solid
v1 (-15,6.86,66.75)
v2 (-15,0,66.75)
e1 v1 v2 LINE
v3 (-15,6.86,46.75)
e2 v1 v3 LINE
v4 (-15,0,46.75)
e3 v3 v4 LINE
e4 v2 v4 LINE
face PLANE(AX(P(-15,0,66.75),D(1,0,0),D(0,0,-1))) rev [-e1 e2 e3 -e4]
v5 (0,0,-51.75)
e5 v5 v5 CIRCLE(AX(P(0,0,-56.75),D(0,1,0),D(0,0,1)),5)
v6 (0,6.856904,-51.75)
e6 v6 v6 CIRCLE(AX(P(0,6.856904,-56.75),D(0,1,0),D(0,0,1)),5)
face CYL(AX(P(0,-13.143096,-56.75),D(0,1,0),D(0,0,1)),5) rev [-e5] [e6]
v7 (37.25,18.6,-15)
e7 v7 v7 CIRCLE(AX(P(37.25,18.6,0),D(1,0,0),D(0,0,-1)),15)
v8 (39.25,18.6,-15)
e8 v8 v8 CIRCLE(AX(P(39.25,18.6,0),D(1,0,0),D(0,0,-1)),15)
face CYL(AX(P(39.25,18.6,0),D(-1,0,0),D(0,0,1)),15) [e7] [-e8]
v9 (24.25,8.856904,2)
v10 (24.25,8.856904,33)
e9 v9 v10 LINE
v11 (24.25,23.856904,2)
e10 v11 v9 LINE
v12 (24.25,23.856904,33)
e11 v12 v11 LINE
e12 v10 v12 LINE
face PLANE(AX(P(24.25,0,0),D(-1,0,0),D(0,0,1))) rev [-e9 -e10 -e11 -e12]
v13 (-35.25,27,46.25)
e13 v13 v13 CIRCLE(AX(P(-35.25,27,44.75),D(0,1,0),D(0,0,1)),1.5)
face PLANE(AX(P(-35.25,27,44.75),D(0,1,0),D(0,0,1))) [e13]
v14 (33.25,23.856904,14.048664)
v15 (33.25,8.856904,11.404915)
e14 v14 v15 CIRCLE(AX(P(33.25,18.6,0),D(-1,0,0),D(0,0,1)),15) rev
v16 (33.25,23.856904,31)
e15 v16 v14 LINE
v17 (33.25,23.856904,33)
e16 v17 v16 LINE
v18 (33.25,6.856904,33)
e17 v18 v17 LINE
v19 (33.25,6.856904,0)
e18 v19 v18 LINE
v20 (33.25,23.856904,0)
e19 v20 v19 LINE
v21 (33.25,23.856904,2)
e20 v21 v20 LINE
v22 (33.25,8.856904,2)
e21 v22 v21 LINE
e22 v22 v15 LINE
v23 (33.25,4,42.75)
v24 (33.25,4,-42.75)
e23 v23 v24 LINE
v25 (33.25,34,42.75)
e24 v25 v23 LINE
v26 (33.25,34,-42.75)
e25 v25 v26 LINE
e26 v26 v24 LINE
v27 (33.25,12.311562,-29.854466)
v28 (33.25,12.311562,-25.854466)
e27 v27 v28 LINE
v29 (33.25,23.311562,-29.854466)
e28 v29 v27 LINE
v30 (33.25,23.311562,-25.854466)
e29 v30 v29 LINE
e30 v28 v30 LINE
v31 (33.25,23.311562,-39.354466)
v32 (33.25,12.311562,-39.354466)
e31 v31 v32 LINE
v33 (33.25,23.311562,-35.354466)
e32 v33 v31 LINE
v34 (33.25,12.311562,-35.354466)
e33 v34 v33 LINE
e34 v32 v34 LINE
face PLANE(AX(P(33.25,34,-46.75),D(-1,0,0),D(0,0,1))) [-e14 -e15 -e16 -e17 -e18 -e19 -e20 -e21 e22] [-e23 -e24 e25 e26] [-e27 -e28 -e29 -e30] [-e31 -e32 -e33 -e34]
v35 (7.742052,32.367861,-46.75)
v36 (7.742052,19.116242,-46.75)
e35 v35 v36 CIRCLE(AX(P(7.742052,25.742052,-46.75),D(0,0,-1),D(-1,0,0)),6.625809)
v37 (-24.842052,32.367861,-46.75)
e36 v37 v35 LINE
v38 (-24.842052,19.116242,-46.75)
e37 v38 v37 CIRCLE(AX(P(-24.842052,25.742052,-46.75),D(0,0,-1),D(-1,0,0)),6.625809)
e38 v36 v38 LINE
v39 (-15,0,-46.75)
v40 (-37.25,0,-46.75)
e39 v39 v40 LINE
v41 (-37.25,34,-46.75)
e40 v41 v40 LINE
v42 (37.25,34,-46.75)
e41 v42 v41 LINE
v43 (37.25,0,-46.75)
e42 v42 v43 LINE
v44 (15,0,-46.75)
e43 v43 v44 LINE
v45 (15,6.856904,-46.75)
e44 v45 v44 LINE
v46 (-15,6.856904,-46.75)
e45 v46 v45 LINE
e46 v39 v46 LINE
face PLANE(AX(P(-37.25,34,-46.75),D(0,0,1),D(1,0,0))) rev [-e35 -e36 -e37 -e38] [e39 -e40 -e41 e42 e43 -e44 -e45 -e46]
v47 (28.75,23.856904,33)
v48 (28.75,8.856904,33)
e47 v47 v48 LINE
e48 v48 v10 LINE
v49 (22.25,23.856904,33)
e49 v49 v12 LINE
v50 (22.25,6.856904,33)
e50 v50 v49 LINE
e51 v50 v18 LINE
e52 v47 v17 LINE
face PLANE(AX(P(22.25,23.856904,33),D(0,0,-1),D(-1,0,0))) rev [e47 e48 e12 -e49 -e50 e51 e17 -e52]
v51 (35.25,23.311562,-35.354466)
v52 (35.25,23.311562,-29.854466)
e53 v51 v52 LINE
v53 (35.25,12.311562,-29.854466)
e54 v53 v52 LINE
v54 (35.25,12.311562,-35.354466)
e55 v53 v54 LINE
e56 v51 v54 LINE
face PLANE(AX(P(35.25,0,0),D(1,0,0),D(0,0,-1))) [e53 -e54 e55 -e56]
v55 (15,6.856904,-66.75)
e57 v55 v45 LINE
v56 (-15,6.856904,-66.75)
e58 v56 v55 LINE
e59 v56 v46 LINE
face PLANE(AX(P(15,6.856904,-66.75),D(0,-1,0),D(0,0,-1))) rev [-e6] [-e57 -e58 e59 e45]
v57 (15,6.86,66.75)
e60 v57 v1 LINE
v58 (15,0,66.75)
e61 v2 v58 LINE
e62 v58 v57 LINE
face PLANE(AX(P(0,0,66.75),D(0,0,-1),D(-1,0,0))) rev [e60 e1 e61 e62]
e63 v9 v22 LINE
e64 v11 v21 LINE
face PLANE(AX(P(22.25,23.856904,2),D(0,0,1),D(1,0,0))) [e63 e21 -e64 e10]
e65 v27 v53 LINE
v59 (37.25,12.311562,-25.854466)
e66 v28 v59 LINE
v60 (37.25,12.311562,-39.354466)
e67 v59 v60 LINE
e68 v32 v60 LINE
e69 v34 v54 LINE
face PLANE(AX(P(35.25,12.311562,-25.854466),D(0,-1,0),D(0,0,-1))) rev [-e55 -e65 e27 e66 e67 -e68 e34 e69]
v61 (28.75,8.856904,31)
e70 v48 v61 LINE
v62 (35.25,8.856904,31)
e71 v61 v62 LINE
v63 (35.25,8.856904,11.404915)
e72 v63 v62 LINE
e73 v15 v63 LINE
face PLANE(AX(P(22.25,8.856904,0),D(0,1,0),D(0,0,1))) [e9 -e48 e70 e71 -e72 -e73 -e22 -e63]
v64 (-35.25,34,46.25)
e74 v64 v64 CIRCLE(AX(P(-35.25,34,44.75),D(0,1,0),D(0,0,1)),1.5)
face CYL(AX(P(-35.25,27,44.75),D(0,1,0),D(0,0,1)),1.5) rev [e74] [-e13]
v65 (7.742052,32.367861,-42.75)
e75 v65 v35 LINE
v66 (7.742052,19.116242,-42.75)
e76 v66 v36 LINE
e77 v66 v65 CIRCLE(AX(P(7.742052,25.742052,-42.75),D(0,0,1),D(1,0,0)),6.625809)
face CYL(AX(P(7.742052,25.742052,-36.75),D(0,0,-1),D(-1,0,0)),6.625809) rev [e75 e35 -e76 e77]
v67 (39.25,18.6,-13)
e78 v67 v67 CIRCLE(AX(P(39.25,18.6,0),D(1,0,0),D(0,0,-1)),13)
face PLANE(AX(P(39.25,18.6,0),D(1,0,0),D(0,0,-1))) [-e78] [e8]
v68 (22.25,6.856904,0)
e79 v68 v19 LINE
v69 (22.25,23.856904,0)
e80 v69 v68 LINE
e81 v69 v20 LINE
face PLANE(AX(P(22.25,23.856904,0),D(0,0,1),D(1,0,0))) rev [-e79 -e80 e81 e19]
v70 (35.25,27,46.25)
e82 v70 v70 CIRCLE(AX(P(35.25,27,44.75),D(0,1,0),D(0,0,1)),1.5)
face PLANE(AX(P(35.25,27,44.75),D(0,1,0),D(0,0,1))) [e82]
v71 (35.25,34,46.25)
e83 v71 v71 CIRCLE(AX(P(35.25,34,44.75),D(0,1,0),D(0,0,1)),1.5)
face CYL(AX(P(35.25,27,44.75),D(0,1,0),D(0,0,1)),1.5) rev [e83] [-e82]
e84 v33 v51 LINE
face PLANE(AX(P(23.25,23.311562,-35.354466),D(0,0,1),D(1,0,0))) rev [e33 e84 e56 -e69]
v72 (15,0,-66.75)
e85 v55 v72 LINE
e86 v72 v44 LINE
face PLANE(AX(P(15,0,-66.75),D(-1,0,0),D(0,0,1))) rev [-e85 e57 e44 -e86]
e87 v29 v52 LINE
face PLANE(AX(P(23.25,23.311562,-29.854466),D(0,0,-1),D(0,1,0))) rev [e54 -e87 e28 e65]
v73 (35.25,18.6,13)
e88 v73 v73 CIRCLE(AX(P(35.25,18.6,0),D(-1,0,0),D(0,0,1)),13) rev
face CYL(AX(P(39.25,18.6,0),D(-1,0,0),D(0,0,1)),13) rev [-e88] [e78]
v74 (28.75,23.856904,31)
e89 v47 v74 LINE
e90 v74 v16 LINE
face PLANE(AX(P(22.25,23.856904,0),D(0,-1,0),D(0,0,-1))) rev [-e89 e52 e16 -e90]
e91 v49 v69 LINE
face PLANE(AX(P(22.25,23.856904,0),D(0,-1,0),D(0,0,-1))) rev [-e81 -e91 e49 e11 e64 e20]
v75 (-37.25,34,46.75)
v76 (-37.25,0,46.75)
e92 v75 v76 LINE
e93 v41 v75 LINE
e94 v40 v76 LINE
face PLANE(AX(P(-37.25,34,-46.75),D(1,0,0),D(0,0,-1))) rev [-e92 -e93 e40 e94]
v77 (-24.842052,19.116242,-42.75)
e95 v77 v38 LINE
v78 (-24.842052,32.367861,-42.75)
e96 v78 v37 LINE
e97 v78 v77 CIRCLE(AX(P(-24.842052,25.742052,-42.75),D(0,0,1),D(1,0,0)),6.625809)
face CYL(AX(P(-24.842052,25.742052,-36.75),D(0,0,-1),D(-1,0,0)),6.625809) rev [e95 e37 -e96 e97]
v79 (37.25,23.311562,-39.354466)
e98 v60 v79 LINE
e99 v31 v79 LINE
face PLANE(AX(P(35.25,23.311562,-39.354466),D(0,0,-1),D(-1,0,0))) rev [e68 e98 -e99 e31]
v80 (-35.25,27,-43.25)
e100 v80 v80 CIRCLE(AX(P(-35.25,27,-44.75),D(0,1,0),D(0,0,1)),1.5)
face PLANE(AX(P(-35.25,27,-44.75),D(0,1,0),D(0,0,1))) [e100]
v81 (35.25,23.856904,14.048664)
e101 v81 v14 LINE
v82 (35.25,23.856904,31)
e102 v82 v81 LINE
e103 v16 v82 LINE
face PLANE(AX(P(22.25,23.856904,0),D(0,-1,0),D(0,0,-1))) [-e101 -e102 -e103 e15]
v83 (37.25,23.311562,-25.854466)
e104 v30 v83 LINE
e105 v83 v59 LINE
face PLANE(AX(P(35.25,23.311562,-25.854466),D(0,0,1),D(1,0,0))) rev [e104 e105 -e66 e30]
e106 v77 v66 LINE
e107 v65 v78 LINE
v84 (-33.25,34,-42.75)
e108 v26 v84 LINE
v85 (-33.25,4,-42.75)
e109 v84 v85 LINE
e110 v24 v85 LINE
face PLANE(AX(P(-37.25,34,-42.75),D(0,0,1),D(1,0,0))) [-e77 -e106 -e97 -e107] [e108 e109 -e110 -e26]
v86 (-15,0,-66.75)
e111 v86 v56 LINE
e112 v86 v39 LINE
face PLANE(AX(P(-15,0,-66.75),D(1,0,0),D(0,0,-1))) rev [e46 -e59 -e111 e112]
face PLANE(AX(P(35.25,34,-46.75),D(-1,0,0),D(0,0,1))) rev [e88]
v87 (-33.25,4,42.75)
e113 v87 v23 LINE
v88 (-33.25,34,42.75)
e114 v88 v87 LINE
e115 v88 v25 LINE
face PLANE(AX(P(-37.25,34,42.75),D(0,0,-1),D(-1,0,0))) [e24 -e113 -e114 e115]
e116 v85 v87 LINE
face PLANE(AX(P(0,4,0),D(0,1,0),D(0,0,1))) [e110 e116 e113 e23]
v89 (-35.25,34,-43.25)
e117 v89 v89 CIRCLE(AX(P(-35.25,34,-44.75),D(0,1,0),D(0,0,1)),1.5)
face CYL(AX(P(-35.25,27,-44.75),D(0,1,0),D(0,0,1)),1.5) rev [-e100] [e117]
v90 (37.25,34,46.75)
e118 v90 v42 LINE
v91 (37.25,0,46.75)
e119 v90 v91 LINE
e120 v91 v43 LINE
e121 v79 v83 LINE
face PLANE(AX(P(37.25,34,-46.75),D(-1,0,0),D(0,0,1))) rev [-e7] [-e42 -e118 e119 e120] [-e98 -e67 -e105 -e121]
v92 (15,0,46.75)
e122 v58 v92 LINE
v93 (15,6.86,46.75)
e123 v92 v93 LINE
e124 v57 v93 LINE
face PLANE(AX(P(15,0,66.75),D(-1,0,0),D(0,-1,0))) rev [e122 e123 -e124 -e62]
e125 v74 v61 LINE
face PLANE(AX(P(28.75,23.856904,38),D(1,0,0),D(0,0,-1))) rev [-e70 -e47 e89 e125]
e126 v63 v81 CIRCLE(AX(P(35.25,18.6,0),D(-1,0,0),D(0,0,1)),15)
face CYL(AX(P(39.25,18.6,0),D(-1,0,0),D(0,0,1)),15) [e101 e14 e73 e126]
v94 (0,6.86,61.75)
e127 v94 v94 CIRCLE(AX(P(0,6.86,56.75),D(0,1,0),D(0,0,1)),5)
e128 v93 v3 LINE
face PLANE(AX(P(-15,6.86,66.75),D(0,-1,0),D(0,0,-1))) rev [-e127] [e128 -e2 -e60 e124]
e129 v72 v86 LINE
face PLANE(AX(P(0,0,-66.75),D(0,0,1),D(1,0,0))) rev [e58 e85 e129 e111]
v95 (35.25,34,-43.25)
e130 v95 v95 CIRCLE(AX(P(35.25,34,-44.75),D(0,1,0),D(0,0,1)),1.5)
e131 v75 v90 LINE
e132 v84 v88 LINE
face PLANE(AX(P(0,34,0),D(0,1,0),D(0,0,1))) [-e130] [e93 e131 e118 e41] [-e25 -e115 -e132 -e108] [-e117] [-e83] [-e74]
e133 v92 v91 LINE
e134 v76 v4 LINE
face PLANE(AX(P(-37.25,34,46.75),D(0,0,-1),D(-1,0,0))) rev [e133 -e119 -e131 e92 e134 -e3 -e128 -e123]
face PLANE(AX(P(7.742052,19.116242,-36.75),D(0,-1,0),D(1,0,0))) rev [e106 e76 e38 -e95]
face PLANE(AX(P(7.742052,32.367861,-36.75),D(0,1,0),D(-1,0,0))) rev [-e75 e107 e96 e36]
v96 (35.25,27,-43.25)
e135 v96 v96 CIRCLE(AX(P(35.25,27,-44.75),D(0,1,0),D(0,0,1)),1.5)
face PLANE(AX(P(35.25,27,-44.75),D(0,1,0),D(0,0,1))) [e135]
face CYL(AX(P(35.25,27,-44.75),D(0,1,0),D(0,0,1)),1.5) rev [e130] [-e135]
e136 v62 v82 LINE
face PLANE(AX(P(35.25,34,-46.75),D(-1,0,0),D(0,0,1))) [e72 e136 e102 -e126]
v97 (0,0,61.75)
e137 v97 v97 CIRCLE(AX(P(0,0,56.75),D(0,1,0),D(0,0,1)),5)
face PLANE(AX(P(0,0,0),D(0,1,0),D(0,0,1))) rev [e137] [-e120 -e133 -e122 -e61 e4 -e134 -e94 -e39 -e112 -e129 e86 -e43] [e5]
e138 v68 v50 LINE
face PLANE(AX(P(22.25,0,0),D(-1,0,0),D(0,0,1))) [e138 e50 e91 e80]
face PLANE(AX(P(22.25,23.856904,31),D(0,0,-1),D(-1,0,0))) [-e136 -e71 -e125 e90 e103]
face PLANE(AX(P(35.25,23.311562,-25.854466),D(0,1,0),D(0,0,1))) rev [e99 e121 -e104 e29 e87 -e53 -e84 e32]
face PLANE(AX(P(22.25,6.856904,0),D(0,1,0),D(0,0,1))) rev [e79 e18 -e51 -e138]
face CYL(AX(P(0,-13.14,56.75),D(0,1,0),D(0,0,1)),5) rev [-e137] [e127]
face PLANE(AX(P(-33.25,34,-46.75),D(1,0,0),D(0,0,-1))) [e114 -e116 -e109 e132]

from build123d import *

# Parameters (mm, degrees)
SKETCH2_W           = 74.5
SKETCH2_H           = 93.5
BOSS_EXTRUDE1_DEPTH = 34
SHELL1_T            = -4
SKETCH4_R           = 15
BOSS_EXTRUDE2_DEPTH = 2
SHELL2_START        = 35.25
SHELL2_OUTLINE_R    = 13
SHELL2_DEPTH        = 4
SKETCH5_W           = 33
SKETCH5_H           = 17
BOSS_EXTRUDE3_DEPTH = 11
SHELL3_START        = 24.25
SHELL3_OUTLINE_W    = 15
SHELL3_OUTLINE_H    = 29
SHELL3_DEPTH        = 9
SHELL3_START_2      = 33.25
SHELL3_2_DEPTH      = 2
SKETCH8_W           = 4.5
SKETCH8_H           = 15
CUT_EXTRUDE1_DEPTH  = 7
SKETCH9_R           = 1.5
CUT_EXTRUDE3_DEPTH  = 7
SKETCH10_W          = 13.5
SKETCH10_H          = 11
CUT_EXTRUDE5_DEPTH  = 2
SKETCH11_W          = 4
SKETCH11_H          = 11
CUT_EXTRUDE6_DEPTH  = 12
CUT_EXTRUDE7_DEPTH  = 10
SKETCH13_W          = 30
SKETCH13_H          = 6.856904394
BOSS_EXTRUDE6_DEPTH = 20
SKETCH19_W          = 30
SKETCH19_H          = 6.86
BOSS_EXTRUDE7_DEPTH = 20
SKETCH20_R          = 5
CUT_EXTRUDE8_DEPTH  = 20
SKETCH21_R          = 5
CUT_EXTRUDE9_DEPTH  = 20


# Read off the part's stored shape, not the designer's step: Shell2, Shell3
with BuildPart() as part:
    # Sketch2 → Boss-Extrude1 (new body)
    with BuildSketch(Plane(origin=(0, 0, 0), x_dir=(1, 0, 0), z_dir=(0, 1, 0))):
        Rectangle(SKETCH2_W, SKETCH2_H)
    extrude(amount=BOSS_EXTRUDE1_DEPTH)

    # Shell1
    shell1_openings = [part.faces().sort_by_distance(p)[0] for p in [
        (0, 34, 0),
    ]]
    offset(amount=SHELL1_T, openings=shell1_openings, kind=Kind.INTERSECTION)

    # Sketch4 → Boss-Extrude2 (add)
    with BuildSketch(Plane(origin=(37.25, 0, 0), x_dir=(0, 0, -1), z_dir=(1, 0, 0))):
        with Locations((0, 18.6)):
            Circle(SKETCH4_R)
    extrude(amount=BOSS_EXTRUDE2_DEPTH)

    # Shell2 outline → Shell2 (cut)
    with BuildSketch(Plane.YZ.offset(SHELL2_START)):
        with Locations((18.6, 0)):
            Circle(SHELL2_OUTLINE_R)
    extrude(amount=SHELL2_DEPTH, mode=Mode.SUBTRACT)

    # Sketch5 → Boss-Extrude3 (add)
    with BuildSketch(Plane.ZY.offset(-33.25)):
        with Locations((16.5, 15.356904394)):
            Rectangle(SKETCH5_W, SKETCH5_H)
    extrude(amount=BOSS_EXTRUDE3_DEPTH)

    # Shell3 outline → Shell3 (cut)
    with BuildSketch(Plane.YZ.offset(SHELL3_START)):
        with Locations((16.356904394, 16.5)):
            Rectangle(SHELL3_OUTLINE_W, SHELL3_OUTLINE_H)
    extrude(amount=SHELL3_DEPTH, mode=Mode.SUBTRACT)

    # Shell3 2 outline → Shell3 2 (cut)
    with BuildSketch(Plane.YZ.offset(SHELL3_START_2)):
        with BuildLine():
            Line((8.856904394, 31), (8.856904394, 11.404915081))
            ThreePointArc((8.856904394, 11.404915081), (15.996381403, 14.77231093), (23.856904394, 14.048663858))
            Line((23.856904394, 14.048663858), (23.856904394, 31))
            Line((23.856904394, 31), (8.856904394, 31))
        make_face()
    extrude(amount=SHELL3_2_DEPTH, mode=Mode.SUBTRACT)

    # Sketch8 → Cut-Extrude1 (cut)
    with BuildSketch(Plane(origin=(0, 0, 31), x_dir=(-1, 0, 0), z_dir=(0, 0, -1))):
        with Locations((-26.5, 16.356904394)):
            Rectangle(SKETCH8_W, SKETCH8_H)
    extrude(amount=-CUT_EXTRUDE1_DEPTH, mode=Mode.SUBTRACT)

    # Sketch9 → Cut-Extrude3 (cut)
    with BuildSketch(Plane(origin=(0, 34, 0), x_dir=(1, 0, 0), z_dir=(0, 1, 0))):
        with Locations(Location((-35.25, -44.75, 0), (0, 0, 270))):
            Circle(SKETCH9_R)
        with Locations(Location((35.25, -44.75, 0), (0, 0, 270))):
            Circle(SKETCH9_R)
        with Locations(Location((35.25, 44.75, 0), (0, 0, 270))):
            Circle(SKETCH9_R)
        with Locations(Location((-35.25, 44.75, 0), (0, 0, 270))):
            Circle(SKETCH9_R)
    extrude(amount=-CUT_EXTRUDE3_DEPTH, mode=Mode.SUBTRACT)

    # Sketch10 → Cut-Extrude5 (cut)
    with BuildSketch(Plane(origin=(37.25, 0, 0), x_dir=(0, 0, -1), z_dir=(1, 0, 0))):
        with Locations((32.604466308, 17.811561776)):
            Rectangle(SKETCH10_W, SKETCH10_H)
    extrude(amount=-CUT_EXTRUDE5_DEPTH, mode=Mode.SUBTRACT)

    # Sketch11 → Cut-Extrude6 (cut)
    with BuildSketch(Plane(origin=(35.25, 0, 0), x_dir=(0, 0, -1), z_dir=(1, 0, 0))):
        with Locations((27.854466308, 17.811561776)):
            Rectangle(SKETCH11_W, SKETCH11_H)
        with Locations((37.354466308, 17.811561776)):
            Rectangle(SKETCH11_W, SKETCH11_H)
    extrude(amount=-CUT_EXTRUDE6_DEPTH, mode=Mode.SUBTRACT)

    # Sketch12 → Cut-Extrude7 (cut)
    with BuildSketch(Plane(origin=(0, 0, -46.75), x_dir=(-1, 0, 0), z_dir=(0, 0, -1))):
        with BuildLine():
            Line((-7.742051662, 32.367861053), (24.842051662, 32.367861053))
            ThreePointArc((24.842051662, 32.367861053), (31.467861053, 25.742051662), (24.842051662, 19.11624227))
            Line((24.842051662, 19.11624227), (-7.742051662, 19.11624227))
            ThreePointArc((-7.742051662, 19.11624227), (-14.367861053, 25.742051662), (-7.742051662, 32.367861053))
        make_face()
    extrude(amount=-CUT_EXTRUDE7_DEPTH, mode=Mode.SUBTRACT)

    # Sketch13 → Boss-Extrude6 (add)
    with BuildSketch(Plane(origin=(0, 0, -46.75), x_dir=(-1, 0, 0), z_dir=(0, 0, -1))):
        with Locations((0, 3.428452197)):
            Rectangle(SKETCH13_W, SKETCH13_H)
    extrude(amount=BOSS_EXTRUDE6_DEPTH)

    # Sketch19 → Boss-Extrude7 (add)
    with BuildSketch(Plane.XY.offset(46.75)):
        with Locations((0, 3.43)):
            Rectangle(SKETCH19_W, SKETCH19_H)
    extrude(amount=BOSS_EXTRUDE7_DEPTH)

    # Sketch20 → Cut-Extrude8 (cut)
    with BuildSketch(Plane(origin=(0, 6.856904394, 0), x_dir=(1, 0, 0), z_dir=(0, 1, 0))):
        with Locations(Location((0, 56.75, 0), (0, 0, 270))):
            Circle(SKETCH20_R)
    extrude(amount=-CUT_EXTRUDE8_DEPTH, mode=Mode.SUBTRACT)

    # Sketch21 → Cut-Extrude9 (cut)
    with BuildSketch(Plane(origin=(0, 6.86, 0), x_dir=(1, 0, 0), z_dir=(0, 1, 0))):
        with Locations(Location((0, -56.75, 0), (0, 0, 270))):
            Circle(SKETCH21_R)
    extrude(amount=-CUT_EXTRUDE9_DEPTH, mode=Mode.SUBTRACT)


solid = part.part
